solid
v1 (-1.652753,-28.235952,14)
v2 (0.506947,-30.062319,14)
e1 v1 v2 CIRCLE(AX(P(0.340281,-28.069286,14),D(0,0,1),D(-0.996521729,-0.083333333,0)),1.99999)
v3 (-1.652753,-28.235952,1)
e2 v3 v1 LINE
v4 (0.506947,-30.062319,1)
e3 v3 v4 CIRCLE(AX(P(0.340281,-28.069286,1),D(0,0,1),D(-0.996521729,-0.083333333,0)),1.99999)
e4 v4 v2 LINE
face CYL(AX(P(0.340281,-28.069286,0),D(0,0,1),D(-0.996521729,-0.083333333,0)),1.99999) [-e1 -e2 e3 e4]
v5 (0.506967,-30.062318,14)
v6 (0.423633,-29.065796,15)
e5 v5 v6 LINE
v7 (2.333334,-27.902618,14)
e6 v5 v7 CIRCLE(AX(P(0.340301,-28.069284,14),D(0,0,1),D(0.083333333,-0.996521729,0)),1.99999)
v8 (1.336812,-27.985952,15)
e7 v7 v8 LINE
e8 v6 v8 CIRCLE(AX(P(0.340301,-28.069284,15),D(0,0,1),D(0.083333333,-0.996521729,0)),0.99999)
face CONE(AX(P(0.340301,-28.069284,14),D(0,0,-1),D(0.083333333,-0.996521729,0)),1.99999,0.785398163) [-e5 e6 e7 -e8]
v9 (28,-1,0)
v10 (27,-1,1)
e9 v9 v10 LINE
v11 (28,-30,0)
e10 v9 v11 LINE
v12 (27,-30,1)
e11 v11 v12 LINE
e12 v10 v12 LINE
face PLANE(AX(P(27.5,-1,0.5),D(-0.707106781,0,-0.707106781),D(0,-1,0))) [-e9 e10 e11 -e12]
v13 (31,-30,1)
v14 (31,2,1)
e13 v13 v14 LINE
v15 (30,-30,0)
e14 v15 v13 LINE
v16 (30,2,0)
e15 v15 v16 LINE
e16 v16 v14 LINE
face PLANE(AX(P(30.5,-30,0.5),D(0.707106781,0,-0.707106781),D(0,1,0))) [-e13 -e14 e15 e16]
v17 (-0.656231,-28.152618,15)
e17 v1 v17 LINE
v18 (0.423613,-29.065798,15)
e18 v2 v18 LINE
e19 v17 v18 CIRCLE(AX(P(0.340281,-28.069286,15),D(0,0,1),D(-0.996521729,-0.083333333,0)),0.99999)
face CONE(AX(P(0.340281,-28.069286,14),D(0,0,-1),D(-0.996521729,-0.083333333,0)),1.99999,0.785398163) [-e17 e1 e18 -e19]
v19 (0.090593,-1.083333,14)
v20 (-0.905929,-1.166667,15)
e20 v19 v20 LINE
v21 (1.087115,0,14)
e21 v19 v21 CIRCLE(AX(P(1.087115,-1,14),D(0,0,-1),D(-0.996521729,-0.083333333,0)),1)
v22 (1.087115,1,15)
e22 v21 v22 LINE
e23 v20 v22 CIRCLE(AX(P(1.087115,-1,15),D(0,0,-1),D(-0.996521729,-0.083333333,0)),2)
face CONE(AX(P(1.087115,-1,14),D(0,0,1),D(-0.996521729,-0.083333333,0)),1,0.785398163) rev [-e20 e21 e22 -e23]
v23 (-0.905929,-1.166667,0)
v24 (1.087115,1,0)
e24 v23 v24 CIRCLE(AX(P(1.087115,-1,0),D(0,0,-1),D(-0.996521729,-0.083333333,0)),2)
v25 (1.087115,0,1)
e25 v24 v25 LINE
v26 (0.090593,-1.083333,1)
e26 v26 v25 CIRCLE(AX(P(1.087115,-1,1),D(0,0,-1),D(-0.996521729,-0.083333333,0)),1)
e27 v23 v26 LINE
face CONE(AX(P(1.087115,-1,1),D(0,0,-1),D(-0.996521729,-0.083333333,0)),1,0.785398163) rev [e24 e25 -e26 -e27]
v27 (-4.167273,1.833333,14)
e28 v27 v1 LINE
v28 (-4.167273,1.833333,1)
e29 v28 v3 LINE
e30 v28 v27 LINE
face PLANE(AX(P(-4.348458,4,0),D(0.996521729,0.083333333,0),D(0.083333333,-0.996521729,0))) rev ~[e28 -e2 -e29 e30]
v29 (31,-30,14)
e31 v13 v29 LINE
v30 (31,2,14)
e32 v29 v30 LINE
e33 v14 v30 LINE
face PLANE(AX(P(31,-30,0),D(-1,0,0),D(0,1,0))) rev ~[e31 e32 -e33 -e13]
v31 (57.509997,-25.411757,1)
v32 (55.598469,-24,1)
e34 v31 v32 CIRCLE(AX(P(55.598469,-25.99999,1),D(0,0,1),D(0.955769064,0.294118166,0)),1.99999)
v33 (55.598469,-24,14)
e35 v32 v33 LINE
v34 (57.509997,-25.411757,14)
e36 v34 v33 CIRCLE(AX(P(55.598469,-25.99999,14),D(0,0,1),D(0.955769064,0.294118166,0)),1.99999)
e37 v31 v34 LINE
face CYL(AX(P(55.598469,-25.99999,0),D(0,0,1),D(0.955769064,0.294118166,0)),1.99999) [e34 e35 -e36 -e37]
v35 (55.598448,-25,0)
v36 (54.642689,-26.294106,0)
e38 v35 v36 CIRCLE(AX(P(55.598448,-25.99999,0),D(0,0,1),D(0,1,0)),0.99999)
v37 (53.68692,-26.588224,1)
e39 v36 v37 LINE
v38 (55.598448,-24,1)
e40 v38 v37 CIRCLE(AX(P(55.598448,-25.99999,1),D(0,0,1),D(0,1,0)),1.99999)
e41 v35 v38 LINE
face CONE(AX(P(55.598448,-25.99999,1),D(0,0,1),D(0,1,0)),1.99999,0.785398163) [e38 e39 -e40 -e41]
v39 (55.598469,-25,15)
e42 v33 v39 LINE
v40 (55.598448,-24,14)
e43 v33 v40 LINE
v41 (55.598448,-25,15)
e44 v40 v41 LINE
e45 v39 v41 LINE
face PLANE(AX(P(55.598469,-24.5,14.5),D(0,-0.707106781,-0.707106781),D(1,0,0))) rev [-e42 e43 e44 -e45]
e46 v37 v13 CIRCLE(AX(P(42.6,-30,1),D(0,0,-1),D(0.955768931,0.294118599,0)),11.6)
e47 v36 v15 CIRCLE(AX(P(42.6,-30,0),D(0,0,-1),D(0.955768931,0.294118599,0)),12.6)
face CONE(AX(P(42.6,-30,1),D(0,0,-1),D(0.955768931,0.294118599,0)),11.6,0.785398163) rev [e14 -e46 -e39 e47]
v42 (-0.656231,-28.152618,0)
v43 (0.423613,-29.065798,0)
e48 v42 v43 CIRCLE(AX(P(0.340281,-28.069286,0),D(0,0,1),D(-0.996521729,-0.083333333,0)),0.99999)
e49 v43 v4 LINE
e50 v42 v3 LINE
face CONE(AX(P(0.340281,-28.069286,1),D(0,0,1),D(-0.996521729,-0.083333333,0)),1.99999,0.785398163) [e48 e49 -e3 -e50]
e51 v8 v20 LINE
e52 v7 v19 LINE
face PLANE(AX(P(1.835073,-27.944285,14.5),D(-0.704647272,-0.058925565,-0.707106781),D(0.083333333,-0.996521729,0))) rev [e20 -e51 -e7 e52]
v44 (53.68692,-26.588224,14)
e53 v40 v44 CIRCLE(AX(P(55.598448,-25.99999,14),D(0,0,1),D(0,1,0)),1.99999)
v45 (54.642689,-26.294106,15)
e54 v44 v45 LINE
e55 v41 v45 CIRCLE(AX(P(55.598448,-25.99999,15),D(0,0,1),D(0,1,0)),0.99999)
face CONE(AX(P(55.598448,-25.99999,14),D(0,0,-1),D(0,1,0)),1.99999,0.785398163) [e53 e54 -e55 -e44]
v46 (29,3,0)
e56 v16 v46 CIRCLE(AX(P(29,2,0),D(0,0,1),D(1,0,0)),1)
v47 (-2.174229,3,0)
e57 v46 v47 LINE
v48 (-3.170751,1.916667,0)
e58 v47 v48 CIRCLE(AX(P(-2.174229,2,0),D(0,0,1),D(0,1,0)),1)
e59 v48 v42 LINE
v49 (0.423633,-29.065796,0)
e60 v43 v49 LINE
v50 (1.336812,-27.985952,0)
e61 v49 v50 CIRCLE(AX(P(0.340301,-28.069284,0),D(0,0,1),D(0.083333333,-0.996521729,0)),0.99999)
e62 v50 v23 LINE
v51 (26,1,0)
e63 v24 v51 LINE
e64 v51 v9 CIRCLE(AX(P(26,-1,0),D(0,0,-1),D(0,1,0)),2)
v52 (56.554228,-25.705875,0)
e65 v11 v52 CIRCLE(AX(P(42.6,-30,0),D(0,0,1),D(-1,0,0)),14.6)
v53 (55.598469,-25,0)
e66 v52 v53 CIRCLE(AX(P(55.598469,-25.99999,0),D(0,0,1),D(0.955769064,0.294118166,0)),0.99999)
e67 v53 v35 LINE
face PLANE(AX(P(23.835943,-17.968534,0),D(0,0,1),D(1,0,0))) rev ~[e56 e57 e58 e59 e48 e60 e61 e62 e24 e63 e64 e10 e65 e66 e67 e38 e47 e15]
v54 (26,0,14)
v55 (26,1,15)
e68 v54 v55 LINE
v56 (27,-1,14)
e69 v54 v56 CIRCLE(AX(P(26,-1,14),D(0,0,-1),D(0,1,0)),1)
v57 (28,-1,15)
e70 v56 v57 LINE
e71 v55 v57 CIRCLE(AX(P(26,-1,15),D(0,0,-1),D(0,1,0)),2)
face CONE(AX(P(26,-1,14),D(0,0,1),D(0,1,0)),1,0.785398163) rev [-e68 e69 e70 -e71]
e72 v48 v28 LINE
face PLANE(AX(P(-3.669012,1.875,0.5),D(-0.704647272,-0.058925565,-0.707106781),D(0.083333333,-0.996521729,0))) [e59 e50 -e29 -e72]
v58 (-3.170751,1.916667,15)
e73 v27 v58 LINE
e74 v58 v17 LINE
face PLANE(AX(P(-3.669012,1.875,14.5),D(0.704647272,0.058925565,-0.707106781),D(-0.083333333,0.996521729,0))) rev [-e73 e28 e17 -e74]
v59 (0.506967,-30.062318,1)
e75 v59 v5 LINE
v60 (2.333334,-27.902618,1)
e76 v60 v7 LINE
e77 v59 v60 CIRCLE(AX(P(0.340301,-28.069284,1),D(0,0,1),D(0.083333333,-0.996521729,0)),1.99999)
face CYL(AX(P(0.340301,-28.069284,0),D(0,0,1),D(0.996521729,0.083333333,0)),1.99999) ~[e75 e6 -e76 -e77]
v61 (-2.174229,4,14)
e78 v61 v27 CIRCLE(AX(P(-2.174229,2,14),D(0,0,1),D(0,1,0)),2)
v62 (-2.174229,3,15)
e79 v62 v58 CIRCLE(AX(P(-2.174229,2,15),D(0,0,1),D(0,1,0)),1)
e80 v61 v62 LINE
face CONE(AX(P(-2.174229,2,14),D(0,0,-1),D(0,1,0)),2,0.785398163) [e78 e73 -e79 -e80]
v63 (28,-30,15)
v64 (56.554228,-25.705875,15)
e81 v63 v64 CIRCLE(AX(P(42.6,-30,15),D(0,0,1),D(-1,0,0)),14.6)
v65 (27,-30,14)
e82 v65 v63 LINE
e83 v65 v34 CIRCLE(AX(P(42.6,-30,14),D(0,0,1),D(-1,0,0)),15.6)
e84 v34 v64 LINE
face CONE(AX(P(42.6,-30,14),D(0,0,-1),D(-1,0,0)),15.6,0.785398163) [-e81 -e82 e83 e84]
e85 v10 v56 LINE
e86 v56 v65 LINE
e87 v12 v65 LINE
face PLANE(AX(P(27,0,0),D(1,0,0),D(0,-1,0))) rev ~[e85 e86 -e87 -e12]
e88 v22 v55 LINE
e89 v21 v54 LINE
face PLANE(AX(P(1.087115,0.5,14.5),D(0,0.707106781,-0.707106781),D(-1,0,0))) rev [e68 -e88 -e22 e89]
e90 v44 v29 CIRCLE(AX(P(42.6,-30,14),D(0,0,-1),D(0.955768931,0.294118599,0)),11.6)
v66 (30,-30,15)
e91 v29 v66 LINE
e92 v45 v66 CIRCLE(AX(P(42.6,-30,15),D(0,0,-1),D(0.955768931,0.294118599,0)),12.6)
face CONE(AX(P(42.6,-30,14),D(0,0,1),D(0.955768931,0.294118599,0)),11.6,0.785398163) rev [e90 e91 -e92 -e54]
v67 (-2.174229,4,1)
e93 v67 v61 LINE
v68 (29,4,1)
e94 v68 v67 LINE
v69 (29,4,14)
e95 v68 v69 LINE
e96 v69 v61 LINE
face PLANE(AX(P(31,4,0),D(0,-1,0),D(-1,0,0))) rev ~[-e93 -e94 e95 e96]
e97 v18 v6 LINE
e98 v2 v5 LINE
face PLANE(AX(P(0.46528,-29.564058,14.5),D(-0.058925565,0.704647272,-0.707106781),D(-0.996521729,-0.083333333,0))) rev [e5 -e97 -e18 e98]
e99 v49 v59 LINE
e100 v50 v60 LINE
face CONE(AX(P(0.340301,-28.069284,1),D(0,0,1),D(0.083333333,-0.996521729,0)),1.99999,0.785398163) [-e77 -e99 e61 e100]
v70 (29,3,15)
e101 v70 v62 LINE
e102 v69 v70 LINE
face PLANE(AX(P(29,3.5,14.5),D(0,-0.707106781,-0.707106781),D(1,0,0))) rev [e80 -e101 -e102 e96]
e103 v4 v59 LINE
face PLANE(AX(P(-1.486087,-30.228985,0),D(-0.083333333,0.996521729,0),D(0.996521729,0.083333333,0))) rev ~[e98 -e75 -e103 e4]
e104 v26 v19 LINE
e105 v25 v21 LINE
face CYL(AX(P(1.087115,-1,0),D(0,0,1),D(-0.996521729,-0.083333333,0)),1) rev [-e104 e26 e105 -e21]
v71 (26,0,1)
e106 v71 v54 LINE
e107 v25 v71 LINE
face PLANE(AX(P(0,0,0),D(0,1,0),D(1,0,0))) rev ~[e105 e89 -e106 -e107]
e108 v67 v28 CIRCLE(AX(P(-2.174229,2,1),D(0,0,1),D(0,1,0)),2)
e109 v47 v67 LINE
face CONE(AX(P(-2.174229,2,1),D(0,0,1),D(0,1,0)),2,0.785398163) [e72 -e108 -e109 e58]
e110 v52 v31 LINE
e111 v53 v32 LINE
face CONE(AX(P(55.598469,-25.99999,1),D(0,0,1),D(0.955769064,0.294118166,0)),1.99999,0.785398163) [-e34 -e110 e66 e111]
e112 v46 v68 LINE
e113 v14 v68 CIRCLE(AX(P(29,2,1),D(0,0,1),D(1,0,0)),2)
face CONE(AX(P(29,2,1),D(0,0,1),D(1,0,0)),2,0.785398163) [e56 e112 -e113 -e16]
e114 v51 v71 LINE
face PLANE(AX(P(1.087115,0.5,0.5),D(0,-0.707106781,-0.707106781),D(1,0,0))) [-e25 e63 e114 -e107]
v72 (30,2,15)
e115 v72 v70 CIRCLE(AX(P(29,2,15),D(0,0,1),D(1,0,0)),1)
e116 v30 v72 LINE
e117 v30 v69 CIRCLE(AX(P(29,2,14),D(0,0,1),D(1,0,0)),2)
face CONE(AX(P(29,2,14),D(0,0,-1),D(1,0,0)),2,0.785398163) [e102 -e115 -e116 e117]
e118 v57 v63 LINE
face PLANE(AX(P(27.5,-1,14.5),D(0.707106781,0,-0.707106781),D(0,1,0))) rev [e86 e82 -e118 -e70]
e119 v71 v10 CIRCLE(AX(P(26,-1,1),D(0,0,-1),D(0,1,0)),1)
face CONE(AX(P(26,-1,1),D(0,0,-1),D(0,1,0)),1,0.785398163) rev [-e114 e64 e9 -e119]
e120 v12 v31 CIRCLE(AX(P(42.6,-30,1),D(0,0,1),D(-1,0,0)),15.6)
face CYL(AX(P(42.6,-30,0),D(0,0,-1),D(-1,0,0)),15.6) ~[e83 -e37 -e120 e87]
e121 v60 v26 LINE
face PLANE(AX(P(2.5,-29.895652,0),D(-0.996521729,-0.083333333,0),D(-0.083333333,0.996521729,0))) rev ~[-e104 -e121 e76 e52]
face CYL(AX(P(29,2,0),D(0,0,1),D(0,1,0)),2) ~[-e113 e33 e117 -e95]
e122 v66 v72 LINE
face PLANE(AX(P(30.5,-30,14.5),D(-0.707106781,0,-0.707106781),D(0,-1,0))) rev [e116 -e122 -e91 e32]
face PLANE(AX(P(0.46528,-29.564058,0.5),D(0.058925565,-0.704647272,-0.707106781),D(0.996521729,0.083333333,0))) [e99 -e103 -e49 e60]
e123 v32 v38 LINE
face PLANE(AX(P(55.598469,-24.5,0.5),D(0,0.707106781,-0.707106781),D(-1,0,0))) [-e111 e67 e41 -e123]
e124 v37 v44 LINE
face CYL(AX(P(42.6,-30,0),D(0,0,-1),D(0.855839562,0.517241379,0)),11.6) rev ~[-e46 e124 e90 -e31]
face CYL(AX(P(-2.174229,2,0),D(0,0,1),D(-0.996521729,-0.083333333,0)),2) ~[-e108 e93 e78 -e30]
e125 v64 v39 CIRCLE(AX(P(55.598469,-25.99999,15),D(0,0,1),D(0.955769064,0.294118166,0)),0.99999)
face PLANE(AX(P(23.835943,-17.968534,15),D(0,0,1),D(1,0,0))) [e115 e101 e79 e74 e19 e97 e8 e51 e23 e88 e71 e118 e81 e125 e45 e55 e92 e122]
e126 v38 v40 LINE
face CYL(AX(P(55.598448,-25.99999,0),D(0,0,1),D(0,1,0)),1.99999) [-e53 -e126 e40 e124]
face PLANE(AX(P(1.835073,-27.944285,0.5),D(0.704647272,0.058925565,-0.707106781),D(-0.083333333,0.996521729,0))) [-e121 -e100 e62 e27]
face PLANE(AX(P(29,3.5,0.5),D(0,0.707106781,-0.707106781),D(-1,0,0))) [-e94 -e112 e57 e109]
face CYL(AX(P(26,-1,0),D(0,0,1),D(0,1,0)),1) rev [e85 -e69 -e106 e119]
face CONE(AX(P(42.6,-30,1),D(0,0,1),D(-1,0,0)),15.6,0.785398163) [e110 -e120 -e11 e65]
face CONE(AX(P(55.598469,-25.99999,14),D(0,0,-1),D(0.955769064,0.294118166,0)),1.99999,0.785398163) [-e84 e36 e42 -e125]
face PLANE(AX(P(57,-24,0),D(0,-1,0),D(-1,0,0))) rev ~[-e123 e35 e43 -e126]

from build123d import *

# Parameters (mm, degrees)
F1_DEPTH = 15
F2_R     = 1.99999
F3_R     = 2
F4_R     = 1
F5_SIZE  = 1


# Not quite as in the source:
# - a fillet or chamfer is up to 0.001 mm smaller than in the source, because OpenCascade refuses the exact size


with BuildPart() as f1:
    # F0 (on Top) → F1 (new body)
    with BuildSketch(Plane.XY):
        with BuildLine():
            Line((2.5, -29.8956518578), (0, 0))
            Line((0, 0), (27, 0))
            Line((27, 0), (27, -30))
            ThreePointArc((27, -30), (45.6594117082, -45.2970585408), (57, -24))
            Line((57, -24), (52.5277389168, -24))
            ThreePointArc((52.5277389168, -24), (45.7143401039, -41.1741167757), (31, -30))
            Line((31, -30), (31, 4))
            Line((31, 4), (-4.348458452, 4))
            Line((-4.348458452, 4), (-1.4860869144, -30.2289851911))
            Line((-1.4860869144, -30.2289851911), (2.5, -29.8956518578))
        make_face()
    extrude(amount=F1_DEPTH)

    # F2 (radius 2 in the source; OpenCascade refuses exactly that, so slightly less here)
    f2_edges = [f1.edges().sort_by_distance(p)[0] for p in [
        (2.5, -29.895652, 7.5),
        (-1.486087, -30.228985, 7.5),
        (52.527739, -24, 7.5),
        (57, -24, 7.5),
    ]]
    fillet(f2_edges, radius=F2_R)

    # F3
    f3_edges = [f1.edges().sort_by_distance(p)[0] for p in [
        (31, 4, 7.5),
        (-4.348458, 4, 7.5),
    ]]
    fillet(f3_edges, radius=F3_R)

    # F4
    f4_edges = [f1.edges().sort_by_distance(p)[0] for p in [
        (0, 0, 7.5),
        (27, 0, 7.5),
    ]]
    fillet(f4_edges, radius=F4_R)

    # F5
    f5_edges = [f1.edges().sort_by_distance(p)[0] for p in [
        (1.211964, -14.492976, 15),
        (0.351135, -0.322997, 15),
        (1.867439, -29.360721, 15),
        (13.543557, 0, 15),
        (0.506957, -30.062319, 15),
        (26.707107, -0.292893, 15),
        (-0.951156, -29.596424, 15),
        (27, -15.5, 15),
        (-2.910013, -13.201309, 15),
        (44.919918, -45.426535, 15),
        (-3.646189, 3.354006, 15),
        (56.78664, -24.391198, 15),
        (13.412885, 4, 15),
        (55.598458, -24, 15),
        (30.414214, 3.414214, 15),
        (53.989656, -24.81182, 15),
        (31, -14, 15),
        (44.32507, -41.471013, 15),
        (1.211964, -14.492976, 0),
        (0.351135, -0.322997, 0),
        (1.867439, -29.360721, 0),
        (13.543557, 0, 0),
        (0.506957, -30.062319, 0),
        (26.707107, -0.292893, 0),
        (-0.951156, -29.596424, 0),
        (27, -15.5, 0),
        (-2.910013, -13.201309, 0),
        (44.919918, -45.426535, 0),
        (-3.646189, 3.354006, 0),
        (56.78664, -24.391198, 0),
        (13.412885, 4, 0),
        (55.598458, -24, 0),
        (30.414214, 3.414214, 0),
        (53.989656, -24.81182, 0),
        (31, -14, 0),
        (44.32507, -41.471013, 0),
    ]]
    chamfer(f5_edges, length=F5_SIZE)


solid = f1.part
